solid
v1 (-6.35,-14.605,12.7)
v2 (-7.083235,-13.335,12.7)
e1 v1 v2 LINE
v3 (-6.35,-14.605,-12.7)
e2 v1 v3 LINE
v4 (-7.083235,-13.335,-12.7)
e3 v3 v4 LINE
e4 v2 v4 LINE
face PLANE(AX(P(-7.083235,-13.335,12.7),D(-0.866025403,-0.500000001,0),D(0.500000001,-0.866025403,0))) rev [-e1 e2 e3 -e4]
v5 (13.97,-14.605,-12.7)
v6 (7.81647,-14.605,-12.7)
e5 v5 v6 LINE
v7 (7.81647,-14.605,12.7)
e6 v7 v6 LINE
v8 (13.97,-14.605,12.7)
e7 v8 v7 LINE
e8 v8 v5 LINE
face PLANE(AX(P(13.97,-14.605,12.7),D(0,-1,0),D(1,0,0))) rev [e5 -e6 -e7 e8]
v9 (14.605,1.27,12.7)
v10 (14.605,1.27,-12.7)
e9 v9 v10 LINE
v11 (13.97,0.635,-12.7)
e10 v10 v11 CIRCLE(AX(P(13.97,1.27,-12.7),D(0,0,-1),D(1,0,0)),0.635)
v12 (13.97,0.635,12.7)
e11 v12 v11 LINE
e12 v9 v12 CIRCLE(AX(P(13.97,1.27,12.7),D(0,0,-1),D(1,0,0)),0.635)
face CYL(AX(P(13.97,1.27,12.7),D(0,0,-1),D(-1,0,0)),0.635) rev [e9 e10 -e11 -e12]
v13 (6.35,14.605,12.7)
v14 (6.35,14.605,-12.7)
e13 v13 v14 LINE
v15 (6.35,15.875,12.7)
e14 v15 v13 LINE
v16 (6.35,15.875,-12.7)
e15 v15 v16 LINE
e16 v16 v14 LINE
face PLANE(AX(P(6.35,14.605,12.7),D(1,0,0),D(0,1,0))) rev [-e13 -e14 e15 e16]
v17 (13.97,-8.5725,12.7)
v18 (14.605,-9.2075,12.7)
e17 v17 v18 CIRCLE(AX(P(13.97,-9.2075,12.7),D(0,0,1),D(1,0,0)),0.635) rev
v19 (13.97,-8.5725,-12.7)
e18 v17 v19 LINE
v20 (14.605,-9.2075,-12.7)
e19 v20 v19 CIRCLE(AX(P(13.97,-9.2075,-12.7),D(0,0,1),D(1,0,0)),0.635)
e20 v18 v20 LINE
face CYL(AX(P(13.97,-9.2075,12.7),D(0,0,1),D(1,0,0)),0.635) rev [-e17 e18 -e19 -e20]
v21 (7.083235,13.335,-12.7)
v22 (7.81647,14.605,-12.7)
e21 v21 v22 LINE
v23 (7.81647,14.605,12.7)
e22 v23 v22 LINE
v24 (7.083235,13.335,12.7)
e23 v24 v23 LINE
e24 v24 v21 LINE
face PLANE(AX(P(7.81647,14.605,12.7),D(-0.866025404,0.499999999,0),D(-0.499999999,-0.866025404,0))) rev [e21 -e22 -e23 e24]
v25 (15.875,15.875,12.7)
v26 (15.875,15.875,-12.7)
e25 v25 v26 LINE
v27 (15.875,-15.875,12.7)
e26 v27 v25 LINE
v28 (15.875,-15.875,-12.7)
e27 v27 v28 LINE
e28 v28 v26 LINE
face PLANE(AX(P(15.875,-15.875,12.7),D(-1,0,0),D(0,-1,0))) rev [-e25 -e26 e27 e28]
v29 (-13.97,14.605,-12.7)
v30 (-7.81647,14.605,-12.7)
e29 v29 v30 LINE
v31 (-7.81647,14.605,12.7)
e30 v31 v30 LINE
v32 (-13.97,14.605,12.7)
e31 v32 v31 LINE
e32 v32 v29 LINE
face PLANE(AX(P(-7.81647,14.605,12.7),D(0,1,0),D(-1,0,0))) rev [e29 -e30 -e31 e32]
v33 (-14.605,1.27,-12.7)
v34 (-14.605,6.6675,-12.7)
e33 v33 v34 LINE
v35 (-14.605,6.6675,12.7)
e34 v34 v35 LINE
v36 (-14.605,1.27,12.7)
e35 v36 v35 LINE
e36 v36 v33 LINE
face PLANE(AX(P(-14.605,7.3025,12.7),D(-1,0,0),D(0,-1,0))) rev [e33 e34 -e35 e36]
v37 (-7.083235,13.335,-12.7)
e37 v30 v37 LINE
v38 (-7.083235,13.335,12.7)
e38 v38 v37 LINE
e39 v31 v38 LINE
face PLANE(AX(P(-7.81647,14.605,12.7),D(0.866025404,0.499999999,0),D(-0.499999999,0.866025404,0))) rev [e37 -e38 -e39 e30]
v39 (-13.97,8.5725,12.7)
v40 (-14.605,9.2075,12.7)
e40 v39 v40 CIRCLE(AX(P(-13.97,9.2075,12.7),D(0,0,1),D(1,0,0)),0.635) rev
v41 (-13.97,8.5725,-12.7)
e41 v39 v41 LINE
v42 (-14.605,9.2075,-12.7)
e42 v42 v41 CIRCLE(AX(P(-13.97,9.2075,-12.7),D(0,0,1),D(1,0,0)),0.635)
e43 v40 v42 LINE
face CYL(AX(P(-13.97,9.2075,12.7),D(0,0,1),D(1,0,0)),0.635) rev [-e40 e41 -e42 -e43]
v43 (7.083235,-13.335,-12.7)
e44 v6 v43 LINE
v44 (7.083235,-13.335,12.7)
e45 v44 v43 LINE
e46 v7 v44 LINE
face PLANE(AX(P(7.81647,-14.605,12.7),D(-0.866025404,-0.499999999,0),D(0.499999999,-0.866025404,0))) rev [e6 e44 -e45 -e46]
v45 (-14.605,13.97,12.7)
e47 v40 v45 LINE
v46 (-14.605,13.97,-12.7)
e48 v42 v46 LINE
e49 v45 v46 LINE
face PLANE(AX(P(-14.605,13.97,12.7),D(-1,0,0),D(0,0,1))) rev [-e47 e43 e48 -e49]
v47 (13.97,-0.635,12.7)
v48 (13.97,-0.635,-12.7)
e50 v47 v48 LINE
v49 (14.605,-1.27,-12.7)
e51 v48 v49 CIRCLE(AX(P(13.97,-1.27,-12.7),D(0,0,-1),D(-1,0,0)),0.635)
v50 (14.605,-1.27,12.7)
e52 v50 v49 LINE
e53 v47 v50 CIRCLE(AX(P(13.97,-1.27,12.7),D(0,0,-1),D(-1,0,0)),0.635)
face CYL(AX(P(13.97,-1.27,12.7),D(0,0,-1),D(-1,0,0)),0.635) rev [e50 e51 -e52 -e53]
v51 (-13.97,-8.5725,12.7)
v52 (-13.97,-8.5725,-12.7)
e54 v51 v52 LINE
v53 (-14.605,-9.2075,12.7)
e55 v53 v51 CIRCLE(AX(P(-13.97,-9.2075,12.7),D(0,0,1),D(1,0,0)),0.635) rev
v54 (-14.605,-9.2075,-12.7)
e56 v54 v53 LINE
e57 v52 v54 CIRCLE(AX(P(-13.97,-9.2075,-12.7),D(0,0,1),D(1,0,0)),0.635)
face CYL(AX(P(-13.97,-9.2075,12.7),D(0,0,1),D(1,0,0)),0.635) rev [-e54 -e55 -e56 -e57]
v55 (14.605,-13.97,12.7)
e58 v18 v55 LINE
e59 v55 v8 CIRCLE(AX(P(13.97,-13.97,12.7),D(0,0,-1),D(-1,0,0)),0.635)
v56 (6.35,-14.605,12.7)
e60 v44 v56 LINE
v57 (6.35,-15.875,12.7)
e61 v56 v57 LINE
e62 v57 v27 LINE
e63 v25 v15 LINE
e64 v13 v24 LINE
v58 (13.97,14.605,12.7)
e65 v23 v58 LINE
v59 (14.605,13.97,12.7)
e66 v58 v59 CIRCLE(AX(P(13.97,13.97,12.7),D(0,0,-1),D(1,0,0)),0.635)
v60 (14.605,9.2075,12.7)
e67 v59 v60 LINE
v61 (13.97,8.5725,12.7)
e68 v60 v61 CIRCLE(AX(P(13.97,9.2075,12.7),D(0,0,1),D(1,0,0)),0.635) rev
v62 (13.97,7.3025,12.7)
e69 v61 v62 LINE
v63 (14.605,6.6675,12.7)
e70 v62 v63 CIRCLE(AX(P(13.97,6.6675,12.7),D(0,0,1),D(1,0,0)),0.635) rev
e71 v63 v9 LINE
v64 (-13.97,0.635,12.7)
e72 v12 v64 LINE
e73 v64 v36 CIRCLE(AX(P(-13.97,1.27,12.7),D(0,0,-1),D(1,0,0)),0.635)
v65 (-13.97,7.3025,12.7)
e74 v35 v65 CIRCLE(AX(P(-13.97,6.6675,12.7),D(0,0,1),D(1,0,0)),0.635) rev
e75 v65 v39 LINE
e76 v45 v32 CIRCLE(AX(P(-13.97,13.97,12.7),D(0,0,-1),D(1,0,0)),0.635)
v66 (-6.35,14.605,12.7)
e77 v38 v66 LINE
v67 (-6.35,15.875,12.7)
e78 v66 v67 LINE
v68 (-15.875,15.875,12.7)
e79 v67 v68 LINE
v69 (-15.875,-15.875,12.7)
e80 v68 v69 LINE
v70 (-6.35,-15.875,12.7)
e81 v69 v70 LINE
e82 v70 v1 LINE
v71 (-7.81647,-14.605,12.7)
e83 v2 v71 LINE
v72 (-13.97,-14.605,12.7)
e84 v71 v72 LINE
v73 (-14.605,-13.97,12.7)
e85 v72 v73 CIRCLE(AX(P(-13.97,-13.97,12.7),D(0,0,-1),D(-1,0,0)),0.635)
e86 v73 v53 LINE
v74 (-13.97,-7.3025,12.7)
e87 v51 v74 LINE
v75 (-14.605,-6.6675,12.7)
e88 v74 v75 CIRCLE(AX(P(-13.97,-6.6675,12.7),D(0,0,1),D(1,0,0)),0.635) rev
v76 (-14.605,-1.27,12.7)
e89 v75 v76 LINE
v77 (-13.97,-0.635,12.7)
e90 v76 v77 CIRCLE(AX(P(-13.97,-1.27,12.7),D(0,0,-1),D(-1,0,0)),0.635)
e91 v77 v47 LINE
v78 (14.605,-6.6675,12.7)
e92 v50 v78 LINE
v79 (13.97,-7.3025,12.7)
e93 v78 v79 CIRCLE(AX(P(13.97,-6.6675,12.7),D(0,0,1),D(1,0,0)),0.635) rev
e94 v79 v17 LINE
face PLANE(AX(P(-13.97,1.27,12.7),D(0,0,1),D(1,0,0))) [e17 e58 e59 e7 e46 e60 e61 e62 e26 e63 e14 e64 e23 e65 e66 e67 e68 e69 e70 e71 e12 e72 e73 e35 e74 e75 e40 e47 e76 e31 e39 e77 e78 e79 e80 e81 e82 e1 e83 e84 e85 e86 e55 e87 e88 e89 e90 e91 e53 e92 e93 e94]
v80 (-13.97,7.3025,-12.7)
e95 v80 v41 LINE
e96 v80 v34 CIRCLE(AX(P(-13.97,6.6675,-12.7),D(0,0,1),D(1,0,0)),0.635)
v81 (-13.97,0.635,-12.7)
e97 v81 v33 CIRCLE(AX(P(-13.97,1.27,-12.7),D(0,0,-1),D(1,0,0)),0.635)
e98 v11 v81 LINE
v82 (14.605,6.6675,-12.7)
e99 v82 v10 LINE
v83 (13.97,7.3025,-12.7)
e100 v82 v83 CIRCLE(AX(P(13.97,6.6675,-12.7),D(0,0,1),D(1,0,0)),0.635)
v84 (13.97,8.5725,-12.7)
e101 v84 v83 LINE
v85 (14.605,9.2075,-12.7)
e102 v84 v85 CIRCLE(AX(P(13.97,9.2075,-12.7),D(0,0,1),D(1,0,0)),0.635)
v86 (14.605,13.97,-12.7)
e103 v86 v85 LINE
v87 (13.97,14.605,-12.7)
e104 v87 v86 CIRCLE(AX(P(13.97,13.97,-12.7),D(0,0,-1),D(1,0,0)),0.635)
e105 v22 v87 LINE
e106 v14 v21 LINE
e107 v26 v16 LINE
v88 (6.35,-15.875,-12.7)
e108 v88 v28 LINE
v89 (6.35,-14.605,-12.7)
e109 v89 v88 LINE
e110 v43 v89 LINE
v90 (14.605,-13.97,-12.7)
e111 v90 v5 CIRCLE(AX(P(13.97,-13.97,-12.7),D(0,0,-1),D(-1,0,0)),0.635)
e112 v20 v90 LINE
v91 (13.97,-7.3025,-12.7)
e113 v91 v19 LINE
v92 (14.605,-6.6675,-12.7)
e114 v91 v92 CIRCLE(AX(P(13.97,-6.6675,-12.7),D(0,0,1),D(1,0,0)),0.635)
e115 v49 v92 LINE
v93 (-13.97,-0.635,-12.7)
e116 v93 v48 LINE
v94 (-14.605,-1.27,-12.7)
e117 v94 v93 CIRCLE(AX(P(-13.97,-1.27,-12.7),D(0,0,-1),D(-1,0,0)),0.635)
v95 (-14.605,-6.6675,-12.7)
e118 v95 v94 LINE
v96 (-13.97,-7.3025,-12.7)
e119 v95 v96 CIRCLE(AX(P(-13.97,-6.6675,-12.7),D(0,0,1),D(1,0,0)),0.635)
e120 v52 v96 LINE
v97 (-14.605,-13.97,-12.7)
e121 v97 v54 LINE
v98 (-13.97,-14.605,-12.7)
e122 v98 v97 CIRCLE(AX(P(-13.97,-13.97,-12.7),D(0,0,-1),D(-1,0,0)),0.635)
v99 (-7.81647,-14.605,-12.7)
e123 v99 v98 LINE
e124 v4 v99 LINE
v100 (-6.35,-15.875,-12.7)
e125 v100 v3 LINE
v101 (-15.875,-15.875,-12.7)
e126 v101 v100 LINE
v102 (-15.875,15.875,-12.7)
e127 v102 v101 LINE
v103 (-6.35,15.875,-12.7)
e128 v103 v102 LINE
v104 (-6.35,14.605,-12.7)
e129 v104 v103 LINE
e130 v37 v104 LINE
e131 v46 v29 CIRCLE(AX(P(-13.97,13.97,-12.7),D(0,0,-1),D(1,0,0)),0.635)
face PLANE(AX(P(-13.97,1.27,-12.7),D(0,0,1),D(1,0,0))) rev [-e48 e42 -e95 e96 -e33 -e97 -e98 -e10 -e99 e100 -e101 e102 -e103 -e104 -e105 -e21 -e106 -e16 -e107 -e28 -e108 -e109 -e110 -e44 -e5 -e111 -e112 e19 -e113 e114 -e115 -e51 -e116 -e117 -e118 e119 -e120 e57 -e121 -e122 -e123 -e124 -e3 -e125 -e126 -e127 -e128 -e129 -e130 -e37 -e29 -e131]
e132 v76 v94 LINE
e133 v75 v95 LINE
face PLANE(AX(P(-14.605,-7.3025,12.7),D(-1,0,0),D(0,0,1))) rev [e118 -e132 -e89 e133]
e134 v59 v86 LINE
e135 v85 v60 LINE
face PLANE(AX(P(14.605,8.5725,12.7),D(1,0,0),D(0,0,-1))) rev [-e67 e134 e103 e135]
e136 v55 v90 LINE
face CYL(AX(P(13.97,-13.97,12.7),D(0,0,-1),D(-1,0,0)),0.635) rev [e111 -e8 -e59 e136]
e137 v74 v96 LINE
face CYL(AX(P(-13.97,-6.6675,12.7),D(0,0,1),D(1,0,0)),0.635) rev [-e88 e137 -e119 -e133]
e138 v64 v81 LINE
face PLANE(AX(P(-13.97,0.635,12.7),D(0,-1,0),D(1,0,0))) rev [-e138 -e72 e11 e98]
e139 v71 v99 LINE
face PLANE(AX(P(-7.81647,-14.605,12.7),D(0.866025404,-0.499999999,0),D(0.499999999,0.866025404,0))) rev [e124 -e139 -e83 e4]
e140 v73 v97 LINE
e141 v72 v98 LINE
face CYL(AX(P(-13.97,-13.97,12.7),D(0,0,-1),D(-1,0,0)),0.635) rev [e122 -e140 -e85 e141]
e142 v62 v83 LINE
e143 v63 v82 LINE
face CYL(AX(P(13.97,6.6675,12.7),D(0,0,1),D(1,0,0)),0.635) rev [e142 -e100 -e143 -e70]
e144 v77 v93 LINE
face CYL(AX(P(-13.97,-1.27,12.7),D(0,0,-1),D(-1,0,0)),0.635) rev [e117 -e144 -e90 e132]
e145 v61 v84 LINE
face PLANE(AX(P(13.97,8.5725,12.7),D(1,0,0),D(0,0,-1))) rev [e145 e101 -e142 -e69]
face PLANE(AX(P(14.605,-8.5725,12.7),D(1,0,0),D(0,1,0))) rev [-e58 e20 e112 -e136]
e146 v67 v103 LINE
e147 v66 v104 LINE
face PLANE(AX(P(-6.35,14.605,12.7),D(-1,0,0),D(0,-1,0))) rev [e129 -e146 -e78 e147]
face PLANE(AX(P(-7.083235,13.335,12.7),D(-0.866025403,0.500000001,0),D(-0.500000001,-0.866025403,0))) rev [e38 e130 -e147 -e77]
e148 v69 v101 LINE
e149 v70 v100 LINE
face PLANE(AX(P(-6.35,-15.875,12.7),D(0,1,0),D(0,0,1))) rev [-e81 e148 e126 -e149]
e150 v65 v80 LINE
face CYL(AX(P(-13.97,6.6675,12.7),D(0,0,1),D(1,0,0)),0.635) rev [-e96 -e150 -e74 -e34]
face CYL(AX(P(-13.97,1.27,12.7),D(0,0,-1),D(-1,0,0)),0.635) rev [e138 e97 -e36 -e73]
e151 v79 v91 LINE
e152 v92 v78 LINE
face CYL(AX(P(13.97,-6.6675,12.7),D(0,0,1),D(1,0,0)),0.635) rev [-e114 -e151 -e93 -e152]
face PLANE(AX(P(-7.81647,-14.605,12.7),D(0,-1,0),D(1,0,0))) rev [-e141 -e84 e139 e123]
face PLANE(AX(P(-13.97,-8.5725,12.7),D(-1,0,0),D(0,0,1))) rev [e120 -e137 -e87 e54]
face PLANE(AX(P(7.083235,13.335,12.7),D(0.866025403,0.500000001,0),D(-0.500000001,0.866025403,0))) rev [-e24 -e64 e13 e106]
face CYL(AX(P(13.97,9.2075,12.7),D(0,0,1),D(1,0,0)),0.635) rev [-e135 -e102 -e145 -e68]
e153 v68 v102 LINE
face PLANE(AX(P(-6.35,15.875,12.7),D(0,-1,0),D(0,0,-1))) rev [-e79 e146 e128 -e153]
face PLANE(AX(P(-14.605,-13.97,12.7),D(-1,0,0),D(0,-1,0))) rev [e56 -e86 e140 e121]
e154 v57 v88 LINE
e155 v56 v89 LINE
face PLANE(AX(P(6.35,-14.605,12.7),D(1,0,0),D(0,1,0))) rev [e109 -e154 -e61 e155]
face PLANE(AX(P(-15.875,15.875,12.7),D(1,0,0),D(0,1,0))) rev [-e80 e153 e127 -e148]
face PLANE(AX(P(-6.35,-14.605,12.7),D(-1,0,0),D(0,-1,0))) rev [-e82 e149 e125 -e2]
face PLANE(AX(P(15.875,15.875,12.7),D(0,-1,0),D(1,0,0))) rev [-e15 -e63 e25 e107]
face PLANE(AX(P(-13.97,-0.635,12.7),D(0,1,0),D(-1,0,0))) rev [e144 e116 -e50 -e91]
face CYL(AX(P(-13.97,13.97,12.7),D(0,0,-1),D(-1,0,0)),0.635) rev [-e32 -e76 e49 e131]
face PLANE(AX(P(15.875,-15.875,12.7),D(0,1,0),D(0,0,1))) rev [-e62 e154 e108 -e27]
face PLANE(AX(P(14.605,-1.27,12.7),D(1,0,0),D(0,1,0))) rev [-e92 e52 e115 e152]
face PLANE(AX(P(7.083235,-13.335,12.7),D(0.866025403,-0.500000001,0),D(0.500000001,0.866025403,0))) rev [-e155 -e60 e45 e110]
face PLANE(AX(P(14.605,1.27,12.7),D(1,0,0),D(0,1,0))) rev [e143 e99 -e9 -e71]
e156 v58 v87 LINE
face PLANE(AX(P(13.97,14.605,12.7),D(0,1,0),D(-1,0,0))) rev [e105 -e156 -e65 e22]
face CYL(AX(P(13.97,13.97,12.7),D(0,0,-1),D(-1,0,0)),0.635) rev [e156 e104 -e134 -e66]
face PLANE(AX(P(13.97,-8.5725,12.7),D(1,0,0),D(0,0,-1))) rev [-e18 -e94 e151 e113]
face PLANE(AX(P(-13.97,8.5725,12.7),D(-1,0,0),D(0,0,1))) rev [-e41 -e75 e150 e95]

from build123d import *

# Parameters (mm, degrees)
BASE_EXTRUDE_DEPTH = 12.7
FILLET1_R          = 0.635


with BuildPart() as part:
    # Sketch1 → Base-Extrude (new, symmetric)
    with BuildSketch(Plane.XY):
        with BuildLine():
            Line((-6.35, 15.875), (-15.875, 15.875))
            Line((-15.875, 15.875), (-15.875, -15.875))
            Line((-15.875, -15.875), (-6.35, -15.875))
            Line((-6.35, -15.875), (-6.35, -14.605))
            Line((-6.35, -14.605), (-7.083234843, -13.335))
            Line((-7.083234843, -13.335), (-7.816469684, -14.605))
            Line((-7.816469684, -14.605), (-13.97, -14.605))
            ThreePointArc((-13.97, -14.605), (-14.419012806, -14.419012806), (-14.605, -13.97))
            Line((-14.605, -13.97), (-14.605, -8.5725))
            Line((-14.605, -8.5725), (-13.97, -8.5725))
            Line((-13.97, -8.5725), (-13.97, -7.3025))
            Line((-13.97, -7.3025), (-14.605, -7.3025))
            Line((-14.605, -7.3025), (-14.605, -1.27))
            ThreePointArc((-14.605, -1.27), (-14.419012806, -0.820987194), (-13.97, -0.635))
            Line((-13.97, -0.635), (13.97, -0.635))
            ThreePointArc((13.97, -0.635), (14.419012806, -0.820987194), (14.605, -1.27))
            Line((14.605, -1.27), (14.605, -7.3025))
            Line((14.605, -7.3025), (13.97, -7.3025))
            Line((13.97, -7.3025), (13.97, -8.5725))
            Line((13.97, -8.5725), (14.605, -8.5725))
            Line((14.605, -8.5725), (14.605, -13.97))
            ThreePointArc((14.605, -13.97), (14.419012806, -14.419012806), (13.97, -14.605))
            Line((13.97, -14.605), (7.816469684, -14.605))
            Line((7.816469684, -14.605), (7.083234843, -13.335))
            Line((7.083234843, -13.335), (6.35, -14.605))
            Line((6.35, -14.605), (6.35, -15.875))
            Line((6.35, -15.875), (15.875, -15.875))
            Line((15.875, -15.875), (15.875, 15.875))
            Line((15.875, 15.875), (6.35, 15.875))
            Line((6.35, 15.875), (6.35, 14.605))
            Line((6.35, 14.605), (7.083234843, 13.335))
            Line((7.083234843, 13.335), (7.816469684, 14.605))
            Line((7.816469684, 14.605), (13.97, 14.605))
            ThreePointArc((13.97, 14.605), (14.419012806, 14.419012806), (14.605, 13.97))
            Line((14.605, 13.97), (14.605, 8.5725))
            Line((14.605, 8.5725), (13.97, 8.5725))
            Line((13.97, 8.5725), (13.97, 7.3025))
            Line((13.97, 7.3025), (14.605, 7.3025))
            Line((14.605, 7.3025), (14.605, 1.27))
            ThreePointArc((14.605, 1.27), (14.419012806, 0.820987194), (13.97, 0.635))
            Line((13.97, 0.635), (-13.97, 0.635))
            ThreePointArc((-13.97, 0.635), (-14.419012806, 0.820987194), (-14.605, 1.27))
            Line((-14.605, 1.27), (-14.605, 7.3025))
            Line((-14.605, 7.3025), (-13.97, 7.3025))
            Line((-13.97, 7.3025), (-13.97, 8.5725))
            Line((-13.97, 8.5725), (-14.605, 8.5725))
            Line((-14.605, 8.5725), (-14.605, 13.97))
            ThreePointArc((-14.605, 13.97), (-14.419012806, 14.419012806), (-13.97, 14.605))
            Line((-13.97, 14.605), (-7.816469684, 14.605))
            Line((-7.816469684, 14.605), (-7.083234843, 13.335))
            Line((-7.083234843, 13.335), (-6.35, 14.605))
            Line((-6.35, 14.605), (-6.35, 15.875))
        make_face()
    extrude(amount=BASE_EXTRUDE_DEPTH, both=True)

    # Fillet1
    fillet1_edges = [part.edges().sort_by_distance(p)[0] for p in [
        (14.605, 8.5725, 0),
        (14.605, -7.3025, 0),
        (-14.605, 8.5725, 0),
        (-14.605, -7.3025, 0),
        (-14.605, 7.3025, 0),
        (-14.605, -8.5725, 0),
        (14.605, 7.3025, 0),
        (14.605, -8.5725, 0),
    ]]
    fillet(fillet1_edges, radius=FILLET1_R - 0.0001)  # a hair under: the kernel refuses the full size


solid = part.part
